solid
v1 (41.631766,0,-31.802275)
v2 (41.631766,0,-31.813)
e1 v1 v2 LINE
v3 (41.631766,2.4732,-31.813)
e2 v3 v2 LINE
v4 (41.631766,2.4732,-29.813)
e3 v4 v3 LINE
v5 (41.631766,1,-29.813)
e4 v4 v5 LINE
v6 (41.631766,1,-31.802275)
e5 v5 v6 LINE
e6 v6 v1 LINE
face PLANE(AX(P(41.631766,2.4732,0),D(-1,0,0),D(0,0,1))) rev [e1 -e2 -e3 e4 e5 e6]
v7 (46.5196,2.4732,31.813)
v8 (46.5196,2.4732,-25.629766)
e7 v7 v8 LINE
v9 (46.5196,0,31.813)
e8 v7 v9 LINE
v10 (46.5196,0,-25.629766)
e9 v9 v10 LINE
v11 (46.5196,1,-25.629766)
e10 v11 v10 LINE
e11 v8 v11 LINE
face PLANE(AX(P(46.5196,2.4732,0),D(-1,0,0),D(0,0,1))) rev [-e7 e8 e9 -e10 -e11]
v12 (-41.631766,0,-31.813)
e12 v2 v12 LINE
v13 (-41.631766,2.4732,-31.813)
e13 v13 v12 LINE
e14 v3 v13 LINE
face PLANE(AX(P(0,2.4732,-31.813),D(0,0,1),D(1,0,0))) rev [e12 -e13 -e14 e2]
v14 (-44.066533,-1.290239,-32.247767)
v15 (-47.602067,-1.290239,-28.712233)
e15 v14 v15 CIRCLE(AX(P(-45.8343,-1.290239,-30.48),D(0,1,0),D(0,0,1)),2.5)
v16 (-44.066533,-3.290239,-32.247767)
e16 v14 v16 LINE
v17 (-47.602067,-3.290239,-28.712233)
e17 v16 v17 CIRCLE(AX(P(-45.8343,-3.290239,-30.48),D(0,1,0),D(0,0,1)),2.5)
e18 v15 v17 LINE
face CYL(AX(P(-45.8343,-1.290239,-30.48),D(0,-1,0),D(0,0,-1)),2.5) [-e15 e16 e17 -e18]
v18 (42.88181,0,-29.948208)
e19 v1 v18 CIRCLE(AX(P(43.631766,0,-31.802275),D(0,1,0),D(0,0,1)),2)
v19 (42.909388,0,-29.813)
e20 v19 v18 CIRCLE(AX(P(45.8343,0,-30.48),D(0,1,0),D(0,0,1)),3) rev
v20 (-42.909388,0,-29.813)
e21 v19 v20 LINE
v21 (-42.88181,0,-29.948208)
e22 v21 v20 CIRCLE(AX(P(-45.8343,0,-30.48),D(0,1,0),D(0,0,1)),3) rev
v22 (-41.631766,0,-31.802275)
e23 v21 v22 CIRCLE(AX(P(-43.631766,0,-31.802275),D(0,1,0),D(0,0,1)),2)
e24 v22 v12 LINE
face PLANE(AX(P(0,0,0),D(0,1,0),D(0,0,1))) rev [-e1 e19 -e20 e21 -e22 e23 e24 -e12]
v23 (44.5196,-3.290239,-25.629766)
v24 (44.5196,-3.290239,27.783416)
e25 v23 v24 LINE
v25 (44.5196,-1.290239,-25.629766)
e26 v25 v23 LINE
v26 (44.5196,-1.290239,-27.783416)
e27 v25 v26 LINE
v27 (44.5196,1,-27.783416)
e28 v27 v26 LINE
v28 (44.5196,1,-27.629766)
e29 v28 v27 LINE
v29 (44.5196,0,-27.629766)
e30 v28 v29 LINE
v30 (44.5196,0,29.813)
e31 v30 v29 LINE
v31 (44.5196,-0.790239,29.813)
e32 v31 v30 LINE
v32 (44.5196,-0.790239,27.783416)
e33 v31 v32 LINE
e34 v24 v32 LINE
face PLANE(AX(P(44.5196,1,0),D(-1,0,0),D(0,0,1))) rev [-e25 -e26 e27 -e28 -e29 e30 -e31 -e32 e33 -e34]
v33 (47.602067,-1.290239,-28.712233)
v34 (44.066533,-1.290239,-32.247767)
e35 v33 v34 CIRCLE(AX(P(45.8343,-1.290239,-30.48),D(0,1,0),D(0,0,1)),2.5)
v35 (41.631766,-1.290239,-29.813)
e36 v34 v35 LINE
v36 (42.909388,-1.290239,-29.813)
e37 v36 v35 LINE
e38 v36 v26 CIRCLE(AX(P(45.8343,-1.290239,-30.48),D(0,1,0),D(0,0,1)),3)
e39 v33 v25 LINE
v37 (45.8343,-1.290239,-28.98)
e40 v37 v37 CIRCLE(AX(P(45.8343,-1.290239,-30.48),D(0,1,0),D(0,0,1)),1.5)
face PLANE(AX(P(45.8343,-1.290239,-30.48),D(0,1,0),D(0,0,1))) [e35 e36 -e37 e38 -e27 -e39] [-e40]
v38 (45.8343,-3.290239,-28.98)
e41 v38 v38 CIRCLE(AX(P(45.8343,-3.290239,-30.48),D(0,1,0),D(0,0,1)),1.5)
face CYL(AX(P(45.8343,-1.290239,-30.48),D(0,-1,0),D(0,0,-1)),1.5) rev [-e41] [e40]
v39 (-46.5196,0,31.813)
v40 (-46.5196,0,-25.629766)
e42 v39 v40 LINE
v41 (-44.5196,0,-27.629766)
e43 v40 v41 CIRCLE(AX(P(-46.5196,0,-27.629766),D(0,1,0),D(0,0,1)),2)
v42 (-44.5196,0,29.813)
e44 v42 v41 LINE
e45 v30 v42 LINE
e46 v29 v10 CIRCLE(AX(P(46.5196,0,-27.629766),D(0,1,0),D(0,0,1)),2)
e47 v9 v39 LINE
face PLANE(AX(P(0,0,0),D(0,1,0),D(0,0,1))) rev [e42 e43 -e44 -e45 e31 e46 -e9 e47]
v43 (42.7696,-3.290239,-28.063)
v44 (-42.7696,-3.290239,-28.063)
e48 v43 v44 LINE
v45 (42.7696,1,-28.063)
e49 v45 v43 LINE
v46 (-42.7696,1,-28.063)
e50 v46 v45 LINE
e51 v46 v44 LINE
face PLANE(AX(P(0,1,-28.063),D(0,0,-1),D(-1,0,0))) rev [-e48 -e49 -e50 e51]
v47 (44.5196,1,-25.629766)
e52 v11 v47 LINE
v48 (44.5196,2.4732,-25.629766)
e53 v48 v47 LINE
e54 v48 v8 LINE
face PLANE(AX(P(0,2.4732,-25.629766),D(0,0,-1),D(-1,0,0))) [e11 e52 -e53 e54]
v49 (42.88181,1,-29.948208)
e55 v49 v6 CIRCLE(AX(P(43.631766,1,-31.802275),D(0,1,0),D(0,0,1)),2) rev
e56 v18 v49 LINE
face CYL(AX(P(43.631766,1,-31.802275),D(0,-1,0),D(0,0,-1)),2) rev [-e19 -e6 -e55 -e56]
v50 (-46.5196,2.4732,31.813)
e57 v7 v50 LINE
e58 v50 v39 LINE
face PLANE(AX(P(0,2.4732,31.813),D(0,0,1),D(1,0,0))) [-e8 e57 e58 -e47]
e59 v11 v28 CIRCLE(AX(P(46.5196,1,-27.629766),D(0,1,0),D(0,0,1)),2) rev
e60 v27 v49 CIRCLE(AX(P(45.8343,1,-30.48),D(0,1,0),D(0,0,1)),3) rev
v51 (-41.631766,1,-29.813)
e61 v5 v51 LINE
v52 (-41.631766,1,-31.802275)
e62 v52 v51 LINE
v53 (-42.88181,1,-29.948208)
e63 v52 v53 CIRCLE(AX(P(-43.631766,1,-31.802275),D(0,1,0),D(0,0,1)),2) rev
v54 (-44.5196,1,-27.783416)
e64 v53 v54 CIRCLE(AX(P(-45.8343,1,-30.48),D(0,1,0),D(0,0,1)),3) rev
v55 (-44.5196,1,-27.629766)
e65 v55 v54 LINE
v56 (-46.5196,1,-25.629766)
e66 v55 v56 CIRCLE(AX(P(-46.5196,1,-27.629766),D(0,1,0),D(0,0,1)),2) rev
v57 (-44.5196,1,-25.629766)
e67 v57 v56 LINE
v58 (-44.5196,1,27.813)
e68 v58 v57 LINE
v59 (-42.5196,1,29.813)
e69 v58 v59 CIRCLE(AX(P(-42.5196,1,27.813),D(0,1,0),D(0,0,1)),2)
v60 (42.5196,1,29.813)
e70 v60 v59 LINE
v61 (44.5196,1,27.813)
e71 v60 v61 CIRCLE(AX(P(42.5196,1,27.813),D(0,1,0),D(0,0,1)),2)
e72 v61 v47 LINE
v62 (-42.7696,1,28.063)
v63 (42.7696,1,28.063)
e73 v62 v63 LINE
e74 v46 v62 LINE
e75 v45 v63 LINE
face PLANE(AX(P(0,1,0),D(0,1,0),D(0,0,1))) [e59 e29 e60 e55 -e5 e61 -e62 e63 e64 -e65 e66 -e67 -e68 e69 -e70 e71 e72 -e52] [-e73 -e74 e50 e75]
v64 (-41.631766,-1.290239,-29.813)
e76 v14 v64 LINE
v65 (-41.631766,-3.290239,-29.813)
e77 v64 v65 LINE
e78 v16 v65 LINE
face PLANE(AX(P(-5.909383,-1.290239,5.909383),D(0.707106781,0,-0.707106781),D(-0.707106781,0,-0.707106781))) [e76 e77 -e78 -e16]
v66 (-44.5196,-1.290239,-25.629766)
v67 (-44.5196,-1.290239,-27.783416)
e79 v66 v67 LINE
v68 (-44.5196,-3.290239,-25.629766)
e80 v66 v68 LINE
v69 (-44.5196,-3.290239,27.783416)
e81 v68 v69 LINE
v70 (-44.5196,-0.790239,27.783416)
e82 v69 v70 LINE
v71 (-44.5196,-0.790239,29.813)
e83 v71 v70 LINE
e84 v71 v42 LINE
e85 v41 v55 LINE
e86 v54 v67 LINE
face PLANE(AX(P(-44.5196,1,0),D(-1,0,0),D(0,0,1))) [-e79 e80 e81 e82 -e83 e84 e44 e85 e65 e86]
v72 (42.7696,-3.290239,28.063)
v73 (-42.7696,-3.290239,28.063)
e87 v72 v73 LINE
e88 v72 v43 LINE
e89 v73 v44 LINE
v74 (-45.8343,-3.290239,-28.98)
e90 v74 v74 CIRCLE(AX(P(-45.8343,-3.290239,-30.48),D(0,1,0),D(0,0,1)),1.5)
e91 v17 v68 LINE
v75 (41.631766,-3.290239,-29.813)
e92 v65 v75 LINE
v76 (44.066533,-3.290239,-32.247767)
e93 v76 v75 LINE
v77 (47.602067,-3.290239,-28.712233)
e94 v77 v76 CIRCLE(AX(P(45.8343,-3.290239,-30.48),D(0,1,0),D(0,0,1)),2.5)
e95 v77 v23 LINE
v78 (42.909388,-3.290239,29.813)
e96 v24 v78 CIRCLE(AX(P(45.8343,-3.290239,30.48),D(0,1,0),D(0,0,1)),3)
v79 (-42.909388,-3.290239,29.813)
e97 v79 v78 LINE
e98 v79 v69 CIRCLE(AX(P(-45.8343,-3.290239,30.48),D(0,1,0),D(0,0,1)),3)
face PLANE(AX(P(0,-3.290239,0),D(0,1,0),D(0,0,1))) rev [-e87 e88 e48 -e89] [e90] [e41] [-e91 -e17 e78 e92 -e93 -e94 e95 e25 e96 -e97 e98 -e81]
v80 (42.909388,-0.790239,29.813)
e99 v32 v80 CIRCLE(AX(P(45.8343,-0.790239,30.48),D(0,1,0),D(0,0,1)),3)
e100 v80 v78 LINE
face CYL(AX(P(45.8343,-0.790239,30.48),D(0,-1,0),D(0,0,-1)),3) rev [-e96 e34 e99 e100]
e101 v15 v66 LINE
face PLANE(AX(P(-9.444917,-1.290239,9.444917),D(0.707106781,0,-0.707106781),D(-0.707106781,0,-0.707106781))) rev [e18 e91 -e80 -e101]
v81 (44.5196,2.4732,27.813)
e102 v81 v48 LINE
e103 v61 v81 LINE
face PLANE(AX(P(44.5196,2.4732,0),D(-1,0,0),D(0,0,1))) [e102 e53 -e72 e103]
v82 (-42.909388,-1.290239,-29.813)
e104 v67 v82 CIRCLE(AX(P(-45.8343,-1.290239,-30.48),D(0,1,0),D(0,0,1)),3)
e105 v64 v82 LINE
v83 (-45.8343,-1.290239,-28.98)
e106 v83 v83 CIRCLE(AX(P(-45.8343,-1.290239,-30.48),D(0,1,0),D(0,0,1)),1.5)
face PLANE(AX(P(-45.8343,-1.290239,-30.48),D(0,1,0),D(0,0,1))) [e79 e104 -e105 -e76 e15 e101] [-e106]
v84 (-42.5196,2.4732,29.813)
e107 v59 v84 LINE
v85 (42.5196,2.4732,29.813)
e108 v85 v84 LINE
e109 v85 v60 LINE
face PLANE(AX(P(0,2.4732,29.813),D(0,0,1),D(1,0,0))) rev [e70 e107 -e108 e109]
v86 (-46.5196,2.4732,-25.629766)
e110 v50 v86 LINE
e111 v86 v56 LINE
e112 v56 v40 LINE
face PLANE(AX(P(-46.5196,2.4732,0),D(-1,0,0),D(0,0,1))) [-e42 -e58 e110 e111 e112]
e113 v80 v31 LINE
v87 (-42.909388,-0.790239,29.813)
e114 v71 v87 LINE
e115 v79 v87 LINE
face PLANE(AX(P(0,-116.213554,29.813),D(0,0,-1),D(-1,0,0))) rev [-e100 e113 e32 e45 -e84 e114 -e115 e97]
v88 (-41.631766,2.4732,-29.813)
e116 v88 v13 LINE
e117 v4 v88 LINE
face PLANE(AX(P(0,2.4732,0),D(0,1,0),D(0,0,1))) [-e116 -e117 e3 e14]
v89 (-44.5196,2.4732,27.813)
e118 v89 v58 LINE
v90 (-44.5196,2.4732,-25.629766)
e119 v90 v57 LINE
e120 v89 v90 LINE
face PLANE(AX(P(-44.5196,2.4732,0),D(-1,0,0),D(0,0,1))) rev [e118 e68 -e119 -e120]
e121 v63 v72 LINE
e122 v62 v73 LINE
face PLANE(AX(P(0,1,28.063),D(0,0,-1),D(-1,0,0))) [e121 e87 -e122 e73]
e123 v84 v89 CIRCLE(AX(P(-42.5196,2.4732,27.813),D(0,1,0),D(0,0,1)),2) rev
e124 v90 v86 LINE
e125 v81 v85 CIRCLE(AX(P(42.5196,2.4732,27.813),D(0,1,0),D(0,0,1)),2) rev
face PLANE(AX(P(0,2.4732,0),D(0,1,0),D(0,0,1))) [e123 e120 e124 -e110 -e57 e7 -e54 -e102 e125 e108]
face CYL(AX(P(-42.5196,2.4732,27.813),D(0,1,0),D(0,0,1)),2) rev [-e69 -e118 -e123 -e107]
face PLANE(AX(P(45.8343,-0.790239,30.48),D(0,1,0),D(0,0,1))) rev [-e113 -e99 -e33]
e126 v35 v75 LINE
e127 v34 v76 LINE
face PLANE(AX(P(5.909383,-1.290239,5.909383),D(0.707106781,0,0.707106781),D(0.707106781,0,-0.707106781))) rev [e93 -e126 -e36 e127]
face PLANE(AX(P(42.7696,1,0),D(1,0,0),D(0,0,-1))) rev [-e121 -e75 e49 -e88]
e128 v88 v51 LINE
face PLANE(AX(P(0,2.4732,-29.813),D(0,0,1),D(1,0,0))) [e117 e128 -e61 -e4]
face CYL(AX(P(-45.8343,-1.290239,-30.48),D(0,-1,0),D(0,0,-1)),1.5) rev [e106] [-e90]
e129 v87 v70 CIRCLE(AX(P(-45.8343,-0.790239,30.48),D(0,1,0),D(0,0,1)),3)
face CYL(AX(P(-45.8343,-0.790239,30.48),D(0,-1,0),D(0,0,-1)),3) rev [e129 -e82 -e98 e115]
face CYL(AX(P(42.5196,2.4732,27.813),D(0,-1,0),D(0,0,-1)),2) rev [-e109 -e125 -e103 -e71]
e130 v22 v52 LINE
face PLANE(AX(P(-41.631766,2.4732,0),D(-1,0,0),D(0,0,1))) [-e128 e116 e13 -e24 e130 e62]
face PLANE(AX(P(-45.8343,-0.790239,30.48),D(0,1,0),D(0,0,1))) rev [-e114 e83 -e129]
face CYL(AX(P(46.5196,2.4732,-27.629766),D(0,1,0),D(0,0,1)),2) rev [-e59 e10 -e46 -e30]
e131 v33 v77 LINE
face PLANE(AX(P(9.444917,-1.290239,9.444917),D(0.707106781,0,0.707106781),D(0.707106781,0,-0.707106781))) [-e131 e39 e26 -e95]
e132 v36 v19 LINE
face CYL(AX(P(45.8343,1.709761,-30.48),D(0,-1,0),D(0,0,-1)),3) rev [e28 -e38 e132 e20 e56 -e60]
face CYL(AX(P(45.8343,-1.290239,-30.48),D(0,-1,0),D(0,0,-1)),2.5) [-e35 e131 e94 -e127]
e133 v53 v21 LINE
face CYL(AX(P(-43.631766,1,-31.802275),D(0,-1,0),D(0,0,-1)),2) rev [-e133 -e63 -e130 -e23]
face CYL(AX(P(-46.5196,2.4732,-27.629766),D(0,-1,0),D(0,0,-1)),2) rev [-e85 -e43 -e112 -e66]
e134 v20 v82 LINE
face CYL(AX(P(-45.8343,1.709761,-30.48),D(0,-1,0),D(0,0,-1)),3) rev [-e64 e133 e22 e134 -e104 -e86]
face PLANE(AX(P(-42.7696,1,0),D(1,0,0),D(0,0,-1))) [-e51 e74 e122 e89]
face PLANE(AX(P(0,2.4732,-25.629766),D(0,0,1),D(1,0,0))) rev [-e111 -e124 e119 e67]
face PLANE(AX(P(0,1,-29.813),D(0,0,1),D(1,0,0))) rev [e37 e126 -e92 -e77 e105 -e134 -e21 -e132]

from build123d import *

# Parameters (mm, degrees)
SKETCH1_W             = 83.263532188
SKETCH1_H             = 2
BOSS_EXTRUDE1_DEPTH   = 2.4732
BOSS_EXTRUDE1_2_DEPTH = 2.4732
SKETCH1_3_W           = 85.5392
SKETCH1_3_H           = 56.126
BOSS_EXTRUDE2_DEPTH   = 1
BOSS_EXTRUDE3_START   = -3.29023885
SKETCH1_4_W           = 85.5392
SKETCH1_4_H           = 56.126
BOSS_EXTRUDE3_DEPTH   = 3.29023885
BOSS_EXTRUDE4_START   = -3.290239
BOSS_EXTRUDE4_DEPTH   = 2
FILLET1_R             = 2
FILLET2_R             = 2
SKETCH2_R             = 3
CUT_EXTRUDE1_DEPTH    = 3
CUT_EXTRUDE2_START    = -2
SKETCH2_3_R           = 3
CUT_EXTRUDE2_DEPTH    = 2.5


with BuildPart() as part:
    # Sketch1 → Boss-Extrude1 (new body)
    with BuildSketch(Plane(origin=(0, 0, 0), x_dir=(1, 0, 0), z_dir=(0, 1, 0))):
        with Locations((0, 30.813)):
            Rectangle(SKETCH1_W, SKETCH1_H)
    extrude(amount=BOSS_EXTRUDE1_DEPTH)



with BuildPart() as body_2:
    # Sketch1 → Boss-Extrude1 2 (new body)
    with BuildSketch(Plane(origin=(0, 0, 0), x_dir=(1, 0, 0), z_dir=(0, 1, 0))):
        Polygon((-44.5196, -29.813), (-44.5196, 25.629766094), (-46.5196, 25.629766094), (-46.5196, -31.813), (46.5196, -31.813), (46.5196, 25.629766094), (44.5196, 25.629766094), (44.5196, -29.813), align=None)
    extrude(amount=BOSS_EXTRUDE1_2_DEPTH)


with BuildPart() as part_1:
    add(part.part)

    add(body_2.part)  # Boss-Extrude2 merges body 2
    # Sketch1<3> → Boss-Extrude2 (add)
    with BuildSketch(Plane(origin=(0, 0, 0), x_dir=(1, 0, 0), z_dir=(0, 1, 0))):
        with BuildLine():
            Line((41.631766094, 29.813), (-41.631766094, 29.813))
            Line((-41.631766094, 29.813), (-43.424920204, 29.813))
            ThreePointArc((-43.424920204, 29.813), (-43.834386894, 28.979884149), (-44.5196, 28.353603069))
            Line((-44.5196, 28.353603069), (-44.5196, 25.629766094))
            Line((-44.5196, 25.629766094), (-44.5196, -29.813))
            Line((-44.5196, -29.813), (44.5196, -29.813))
            Line((44.5196, -29.813), (44.5196, 25.629766094))
            Line((44.5196, 25.629766094), (44.5196, 28.353603069))
            ThreePointArc((44.5196, 28.353603069), (43.834386894, 28.979884149), (43.424920204, 29.813))
            Line((43.424920204, 29.813), (41.631766094, 29.813))
        make_face()
        Rectangle(SKETCH1_3_W, SKETCH1_3_H, mode=Mode.SUBTRACT)
    extrude(amount=BOSS_EXTRUDE2_DEPTH)

    # Sketch1<4> → Boss-Extrude3 (add)
    with BuildSketch(Plane(origin=(0, 0, 0), x_dir=(1, 0, 0), z_dir=(0, 1, 0)).offset(BOSS_EXTRUDE3_START)):
        with BuildLine():
            Line((41.631766094, 29.813), (-41.631766094, 29.813))
            Line((-41.631766094, 29.813), (-43.424920204, 29.813))
            ThreePointArc((-43.424920204, 29.813), (-43.834386894, 28.979884149), (-44.5196, 28.353603069))
            Line((-44.5196, 28.353603069), (-44.5196, 25.629766094))
            Line((-44.5196, 25.629766094), (-44.5196, -29.813))
            Line((-44.5196, -29.813), (44.5196, -29.813))
            Line((44.5196, -29.813), (44.5196, 25.629766094))
            Line((44.5196, 25.629766094), (44.5196, 28.353603069))
            ThreePointArc((44.5196, 28.353603069), (43.834386894, 28.979884149), (43.424920204, 29.813))
            Line((43.424920204, 29.813), (41.631766094, 29.813))
        make_face()
        Rectangle(SKETCH1_4_W, SKETCH1_4_H, mode=Mode.SUBTRACT)
    extrude(amount=BOSS_EXTRUDE3_DEPTH)

    # Sketch1<5> → Boss-Extrude4 (add)
    with BuildSketch(Plane(origin=(0, 0, 0), x_dir=(1, 0, 0), z_dir=(0, 1, 0)).offset(BOSS_EXTRUDE4_START)):
        with BuildLine():
            ThreePointArc((-43.3343, 30.48), (-43.524601169, 31.436708581), (-44.066533047, 32.247766953))
            ThreePointArc((-44.066533047, 32.247766953), (-47.602066953, 32.247766953), (-47.602066953, 28.712233047))
            ThreePointArc((-47.602066953, 28.712233047), (-46.123213969, 27.996750371), (-44.5196, 28.353603069))
            Line((-44.5196, 28.353603069), (-44.5196, 29.757806183))
            ThreePointArc((-44.5196, 29.757806183), (-47.287236681, 30.852793509), (-44.3343, 30.48))
            ThreePointArc((-44.3343, 30.48), (-44.373937666, 30.137448026), (-44.490755806, 29.813))
            Line((-44.490755806, 29.813), (-43.424920204, 29.813))
            ThreePointArc((-43.424920204, 29.813), (-43.357058642, 30.143436105), (-43.3343, 30.48))
        make_face()
        with BuildLine():
            ThreePointArc((-44.5196, 28.353603069), (-43.834386894, 28.979884149), (-43.424920204, 29.813))
            Line((-43.424920204, 29.813), (-44.490755806, 29.813))
            ThreePointArc((-44.490755806, 29.813), (-44.504891433, 29.785253383), (-44.5196, 29.757806183))
            Line((-44.5196, 29.757806183), (-44.5196, 28.353603069))
        make_face()
        with BuildLine():
            ThreePointArc((-44.5196, 28.353603069), (-46.123213969, 27.996750371), (-47.602066953, 28.712233047))
            Line((-47.602066953, 28.712233047), (-44.5196, 25.629766094))
            Line((-44.5196, 25.629766094), (-44.5196, 28.353603069))
        make_face()
        with BuildLine():
            Line((-41.631766094, 29.813), (-44.066533047, 32.247766953))
            ThreePointArc((-44.066533047, 32.247766953), (-43.524601169, 31.436708581), (-43.3343, 30.48))
            ThreePointArc((-43.3343, 30.48), (-43.357058642, 30.143436105), (-43.424920204, 29.813))
            Line((-43.424920204, 29.813), (-41.631766094, 29.813))
        make_face()
        with BuildLine():
            ThreePointArc((44.066533047, 32.247766953), (43.416829986, 31.117054732), (43.424920204, 29.813))
            Line((43.424920204, 29.813), (44.490755806, 29.813))
            ThreePointArc((44.490755806, 29.813), (45.491748026, 31.940362334), (47.3343, 30.48))
            ThreePointArc((47.3343, 30.48), (46.207093509, 29.027063319), (44.5196, 29.757806183))
            Line((44.5196, 29.757806183), (44.5196, 28.353603069))
            ThreePointArc((44.5196, 28.353603069), (46.123213969, 27.996750371), (47.602066953, 28.712233047))
            ThreePointArc((47.602066953, 28.712233047), (48.143998831, 29.523291419), (48.3343, 30.48))
            ThreePointArc((48.3343, 30.48), (46.791008581, 32.789698831), (44.066533047, 32.247766953))
        make_face()
        with BuildLine():
            Line((44.490755806, 29.813), (43.424920204, 29.813))
            ThreePointArc((43.424920204, 29.813), (43.834386894, 28.979884149), (44.5196, 28.353603069))
            Line((44.5196, 28.353603069), (44.5196, 29.757806183))
            ThreePointArc((44.5196, 29.757806183), (44.504891433, 29.785253383), (44.490755806, 29.813))
        make_face()
        with BuildLine():
            Line((44.066533047, 32.247766953), (41.631766094, 29.813))
            Line((41.631766094, 29.813), (43.424920204, 29.813))
            ThreePointArc((43.424920204, 29.813), (43.416829986, 31.117054732), (44.066533047, 32.247766953))
        make_face()
        with BuildLine():
            ThreePointArc((47.602066953, 28.712233047), (46.123213969, 27.996750371), (44.5196, 28.353603069))
            Line((44.5196, 28.353603069), (44.5196, 25.629766094))
            Line((44.5196, 25.629766094), (47.602066953, 28.712233047))
        make_face()
    extrude(amount=BOSS_EXTRUDE4_DEPTH)

    # Fillet1
    # the kernel refuses this fillet: 2 mm, written as the material it adds along each edge
    with BuildSketch(Plane(origin=(44.5196, 0, -25.629766094), x_dir=(0, 0, -1), z_dir=(0, 1, 0))) as fillet1_piece_1:
        with BuildLine():
            CenterArc((FILLET1_R, -FILLET1_R), FILLET1_R, 90, 90)
            Line((0, -FILLET1_R), (0, 0))
            Line((0, 0), (FILLET1_R, 0))
        make_face()
    extrude(amount=1)
    with BuildSketch(Plane(origin=(41.631766094, 0, -29.813), x_dir=(0, 0, -1), z_dir=(0, 1, 0))) as fillet1_piece_2:
        with BuildLine():
            CenterArc((1.989274938, -2), FILLET1_R, 90, 84.063686733)
            Line((0, -1.79315411), (0, 0))
            Line((0, 0), (1.989274938, 0))
        make_face()
    extrude(amount=1)
    with BuildSketch(Plane(origin=(-41.631766094, 0, -29.813), x_dir=(-1, 0, 0), z_dir=(0, 1, 0))) as fillet1_piece_3:
        with BuildLine():
            CenterArc((2, -1.989274938), FILLET1_R, 95.936313267, 84.063686733)
            Line((0, -1.989274938), (0, 0))
            Line((0, 0), (1.79315411, 0))
        make_face()
    extrude(amount=1)
    with BuildSketch(Plane(origin=(-44.5196, 0, -25.629766094), x_dir=(0, 0, -1), z_dir=(0, 1, 0))) as fillet1_piece_4:
        with BuildLine():
            CenterArc((FILLET1_R, FILLET1_R), FILLET1_R, 180, 90)
            Line((0, FILLET1_R), (0, 0))
            Line((0, 0), (FILLET1_R, 0))
        make_face()
    extrude(amount=1)

    # Fillet2
    fillet2_edges = [part_1.edges().sort_by_distance(p)[0] for p in [
        (-44.5196, 1.7366, 29.813),
        (44.5196, 1.7366, 29.813),
    ]]
    fillet(fillet2_edges, radius=FILLET2_R)

    # Sketch2 → Cut-Extrude1 (cut)
    with BuildSketch(Plane(origin=(0, -1.29023885, 0), x_dir=(1, 0, 0), z_dir=(0, 1, 0))):
        with Locations((-45.8343, 30.48)):
            Circle(SKETCH2_R)
        with Locations((45.8343, 30.48)):
            Circle(SKETCH2_R)
    extrude(amount=CUT_EXTRUDE1_DEPTH, mode=Mode.SUBTRACT)

    # Sketch2<3> → Cut-Extrude2 (cut)
    with BuildSketch(Plane(origin=(0, -1.29023885, 0), x_dir=(1, 0, 0), z_dir=(0, 1, 0)).offset(CUT_EXTRUDE2_START)):
        with Locations((-45.8343, -30.48)):
            Circle(SKETCH2_3_R)
        with Locations((45.8343, -30.48)):
            Circle(SKETCH2_3_R)
    extrude(amount=CUT_EXTRUDE2_DEPTH, mode=Mode.SUBTRACT)


solid = part_1.part
